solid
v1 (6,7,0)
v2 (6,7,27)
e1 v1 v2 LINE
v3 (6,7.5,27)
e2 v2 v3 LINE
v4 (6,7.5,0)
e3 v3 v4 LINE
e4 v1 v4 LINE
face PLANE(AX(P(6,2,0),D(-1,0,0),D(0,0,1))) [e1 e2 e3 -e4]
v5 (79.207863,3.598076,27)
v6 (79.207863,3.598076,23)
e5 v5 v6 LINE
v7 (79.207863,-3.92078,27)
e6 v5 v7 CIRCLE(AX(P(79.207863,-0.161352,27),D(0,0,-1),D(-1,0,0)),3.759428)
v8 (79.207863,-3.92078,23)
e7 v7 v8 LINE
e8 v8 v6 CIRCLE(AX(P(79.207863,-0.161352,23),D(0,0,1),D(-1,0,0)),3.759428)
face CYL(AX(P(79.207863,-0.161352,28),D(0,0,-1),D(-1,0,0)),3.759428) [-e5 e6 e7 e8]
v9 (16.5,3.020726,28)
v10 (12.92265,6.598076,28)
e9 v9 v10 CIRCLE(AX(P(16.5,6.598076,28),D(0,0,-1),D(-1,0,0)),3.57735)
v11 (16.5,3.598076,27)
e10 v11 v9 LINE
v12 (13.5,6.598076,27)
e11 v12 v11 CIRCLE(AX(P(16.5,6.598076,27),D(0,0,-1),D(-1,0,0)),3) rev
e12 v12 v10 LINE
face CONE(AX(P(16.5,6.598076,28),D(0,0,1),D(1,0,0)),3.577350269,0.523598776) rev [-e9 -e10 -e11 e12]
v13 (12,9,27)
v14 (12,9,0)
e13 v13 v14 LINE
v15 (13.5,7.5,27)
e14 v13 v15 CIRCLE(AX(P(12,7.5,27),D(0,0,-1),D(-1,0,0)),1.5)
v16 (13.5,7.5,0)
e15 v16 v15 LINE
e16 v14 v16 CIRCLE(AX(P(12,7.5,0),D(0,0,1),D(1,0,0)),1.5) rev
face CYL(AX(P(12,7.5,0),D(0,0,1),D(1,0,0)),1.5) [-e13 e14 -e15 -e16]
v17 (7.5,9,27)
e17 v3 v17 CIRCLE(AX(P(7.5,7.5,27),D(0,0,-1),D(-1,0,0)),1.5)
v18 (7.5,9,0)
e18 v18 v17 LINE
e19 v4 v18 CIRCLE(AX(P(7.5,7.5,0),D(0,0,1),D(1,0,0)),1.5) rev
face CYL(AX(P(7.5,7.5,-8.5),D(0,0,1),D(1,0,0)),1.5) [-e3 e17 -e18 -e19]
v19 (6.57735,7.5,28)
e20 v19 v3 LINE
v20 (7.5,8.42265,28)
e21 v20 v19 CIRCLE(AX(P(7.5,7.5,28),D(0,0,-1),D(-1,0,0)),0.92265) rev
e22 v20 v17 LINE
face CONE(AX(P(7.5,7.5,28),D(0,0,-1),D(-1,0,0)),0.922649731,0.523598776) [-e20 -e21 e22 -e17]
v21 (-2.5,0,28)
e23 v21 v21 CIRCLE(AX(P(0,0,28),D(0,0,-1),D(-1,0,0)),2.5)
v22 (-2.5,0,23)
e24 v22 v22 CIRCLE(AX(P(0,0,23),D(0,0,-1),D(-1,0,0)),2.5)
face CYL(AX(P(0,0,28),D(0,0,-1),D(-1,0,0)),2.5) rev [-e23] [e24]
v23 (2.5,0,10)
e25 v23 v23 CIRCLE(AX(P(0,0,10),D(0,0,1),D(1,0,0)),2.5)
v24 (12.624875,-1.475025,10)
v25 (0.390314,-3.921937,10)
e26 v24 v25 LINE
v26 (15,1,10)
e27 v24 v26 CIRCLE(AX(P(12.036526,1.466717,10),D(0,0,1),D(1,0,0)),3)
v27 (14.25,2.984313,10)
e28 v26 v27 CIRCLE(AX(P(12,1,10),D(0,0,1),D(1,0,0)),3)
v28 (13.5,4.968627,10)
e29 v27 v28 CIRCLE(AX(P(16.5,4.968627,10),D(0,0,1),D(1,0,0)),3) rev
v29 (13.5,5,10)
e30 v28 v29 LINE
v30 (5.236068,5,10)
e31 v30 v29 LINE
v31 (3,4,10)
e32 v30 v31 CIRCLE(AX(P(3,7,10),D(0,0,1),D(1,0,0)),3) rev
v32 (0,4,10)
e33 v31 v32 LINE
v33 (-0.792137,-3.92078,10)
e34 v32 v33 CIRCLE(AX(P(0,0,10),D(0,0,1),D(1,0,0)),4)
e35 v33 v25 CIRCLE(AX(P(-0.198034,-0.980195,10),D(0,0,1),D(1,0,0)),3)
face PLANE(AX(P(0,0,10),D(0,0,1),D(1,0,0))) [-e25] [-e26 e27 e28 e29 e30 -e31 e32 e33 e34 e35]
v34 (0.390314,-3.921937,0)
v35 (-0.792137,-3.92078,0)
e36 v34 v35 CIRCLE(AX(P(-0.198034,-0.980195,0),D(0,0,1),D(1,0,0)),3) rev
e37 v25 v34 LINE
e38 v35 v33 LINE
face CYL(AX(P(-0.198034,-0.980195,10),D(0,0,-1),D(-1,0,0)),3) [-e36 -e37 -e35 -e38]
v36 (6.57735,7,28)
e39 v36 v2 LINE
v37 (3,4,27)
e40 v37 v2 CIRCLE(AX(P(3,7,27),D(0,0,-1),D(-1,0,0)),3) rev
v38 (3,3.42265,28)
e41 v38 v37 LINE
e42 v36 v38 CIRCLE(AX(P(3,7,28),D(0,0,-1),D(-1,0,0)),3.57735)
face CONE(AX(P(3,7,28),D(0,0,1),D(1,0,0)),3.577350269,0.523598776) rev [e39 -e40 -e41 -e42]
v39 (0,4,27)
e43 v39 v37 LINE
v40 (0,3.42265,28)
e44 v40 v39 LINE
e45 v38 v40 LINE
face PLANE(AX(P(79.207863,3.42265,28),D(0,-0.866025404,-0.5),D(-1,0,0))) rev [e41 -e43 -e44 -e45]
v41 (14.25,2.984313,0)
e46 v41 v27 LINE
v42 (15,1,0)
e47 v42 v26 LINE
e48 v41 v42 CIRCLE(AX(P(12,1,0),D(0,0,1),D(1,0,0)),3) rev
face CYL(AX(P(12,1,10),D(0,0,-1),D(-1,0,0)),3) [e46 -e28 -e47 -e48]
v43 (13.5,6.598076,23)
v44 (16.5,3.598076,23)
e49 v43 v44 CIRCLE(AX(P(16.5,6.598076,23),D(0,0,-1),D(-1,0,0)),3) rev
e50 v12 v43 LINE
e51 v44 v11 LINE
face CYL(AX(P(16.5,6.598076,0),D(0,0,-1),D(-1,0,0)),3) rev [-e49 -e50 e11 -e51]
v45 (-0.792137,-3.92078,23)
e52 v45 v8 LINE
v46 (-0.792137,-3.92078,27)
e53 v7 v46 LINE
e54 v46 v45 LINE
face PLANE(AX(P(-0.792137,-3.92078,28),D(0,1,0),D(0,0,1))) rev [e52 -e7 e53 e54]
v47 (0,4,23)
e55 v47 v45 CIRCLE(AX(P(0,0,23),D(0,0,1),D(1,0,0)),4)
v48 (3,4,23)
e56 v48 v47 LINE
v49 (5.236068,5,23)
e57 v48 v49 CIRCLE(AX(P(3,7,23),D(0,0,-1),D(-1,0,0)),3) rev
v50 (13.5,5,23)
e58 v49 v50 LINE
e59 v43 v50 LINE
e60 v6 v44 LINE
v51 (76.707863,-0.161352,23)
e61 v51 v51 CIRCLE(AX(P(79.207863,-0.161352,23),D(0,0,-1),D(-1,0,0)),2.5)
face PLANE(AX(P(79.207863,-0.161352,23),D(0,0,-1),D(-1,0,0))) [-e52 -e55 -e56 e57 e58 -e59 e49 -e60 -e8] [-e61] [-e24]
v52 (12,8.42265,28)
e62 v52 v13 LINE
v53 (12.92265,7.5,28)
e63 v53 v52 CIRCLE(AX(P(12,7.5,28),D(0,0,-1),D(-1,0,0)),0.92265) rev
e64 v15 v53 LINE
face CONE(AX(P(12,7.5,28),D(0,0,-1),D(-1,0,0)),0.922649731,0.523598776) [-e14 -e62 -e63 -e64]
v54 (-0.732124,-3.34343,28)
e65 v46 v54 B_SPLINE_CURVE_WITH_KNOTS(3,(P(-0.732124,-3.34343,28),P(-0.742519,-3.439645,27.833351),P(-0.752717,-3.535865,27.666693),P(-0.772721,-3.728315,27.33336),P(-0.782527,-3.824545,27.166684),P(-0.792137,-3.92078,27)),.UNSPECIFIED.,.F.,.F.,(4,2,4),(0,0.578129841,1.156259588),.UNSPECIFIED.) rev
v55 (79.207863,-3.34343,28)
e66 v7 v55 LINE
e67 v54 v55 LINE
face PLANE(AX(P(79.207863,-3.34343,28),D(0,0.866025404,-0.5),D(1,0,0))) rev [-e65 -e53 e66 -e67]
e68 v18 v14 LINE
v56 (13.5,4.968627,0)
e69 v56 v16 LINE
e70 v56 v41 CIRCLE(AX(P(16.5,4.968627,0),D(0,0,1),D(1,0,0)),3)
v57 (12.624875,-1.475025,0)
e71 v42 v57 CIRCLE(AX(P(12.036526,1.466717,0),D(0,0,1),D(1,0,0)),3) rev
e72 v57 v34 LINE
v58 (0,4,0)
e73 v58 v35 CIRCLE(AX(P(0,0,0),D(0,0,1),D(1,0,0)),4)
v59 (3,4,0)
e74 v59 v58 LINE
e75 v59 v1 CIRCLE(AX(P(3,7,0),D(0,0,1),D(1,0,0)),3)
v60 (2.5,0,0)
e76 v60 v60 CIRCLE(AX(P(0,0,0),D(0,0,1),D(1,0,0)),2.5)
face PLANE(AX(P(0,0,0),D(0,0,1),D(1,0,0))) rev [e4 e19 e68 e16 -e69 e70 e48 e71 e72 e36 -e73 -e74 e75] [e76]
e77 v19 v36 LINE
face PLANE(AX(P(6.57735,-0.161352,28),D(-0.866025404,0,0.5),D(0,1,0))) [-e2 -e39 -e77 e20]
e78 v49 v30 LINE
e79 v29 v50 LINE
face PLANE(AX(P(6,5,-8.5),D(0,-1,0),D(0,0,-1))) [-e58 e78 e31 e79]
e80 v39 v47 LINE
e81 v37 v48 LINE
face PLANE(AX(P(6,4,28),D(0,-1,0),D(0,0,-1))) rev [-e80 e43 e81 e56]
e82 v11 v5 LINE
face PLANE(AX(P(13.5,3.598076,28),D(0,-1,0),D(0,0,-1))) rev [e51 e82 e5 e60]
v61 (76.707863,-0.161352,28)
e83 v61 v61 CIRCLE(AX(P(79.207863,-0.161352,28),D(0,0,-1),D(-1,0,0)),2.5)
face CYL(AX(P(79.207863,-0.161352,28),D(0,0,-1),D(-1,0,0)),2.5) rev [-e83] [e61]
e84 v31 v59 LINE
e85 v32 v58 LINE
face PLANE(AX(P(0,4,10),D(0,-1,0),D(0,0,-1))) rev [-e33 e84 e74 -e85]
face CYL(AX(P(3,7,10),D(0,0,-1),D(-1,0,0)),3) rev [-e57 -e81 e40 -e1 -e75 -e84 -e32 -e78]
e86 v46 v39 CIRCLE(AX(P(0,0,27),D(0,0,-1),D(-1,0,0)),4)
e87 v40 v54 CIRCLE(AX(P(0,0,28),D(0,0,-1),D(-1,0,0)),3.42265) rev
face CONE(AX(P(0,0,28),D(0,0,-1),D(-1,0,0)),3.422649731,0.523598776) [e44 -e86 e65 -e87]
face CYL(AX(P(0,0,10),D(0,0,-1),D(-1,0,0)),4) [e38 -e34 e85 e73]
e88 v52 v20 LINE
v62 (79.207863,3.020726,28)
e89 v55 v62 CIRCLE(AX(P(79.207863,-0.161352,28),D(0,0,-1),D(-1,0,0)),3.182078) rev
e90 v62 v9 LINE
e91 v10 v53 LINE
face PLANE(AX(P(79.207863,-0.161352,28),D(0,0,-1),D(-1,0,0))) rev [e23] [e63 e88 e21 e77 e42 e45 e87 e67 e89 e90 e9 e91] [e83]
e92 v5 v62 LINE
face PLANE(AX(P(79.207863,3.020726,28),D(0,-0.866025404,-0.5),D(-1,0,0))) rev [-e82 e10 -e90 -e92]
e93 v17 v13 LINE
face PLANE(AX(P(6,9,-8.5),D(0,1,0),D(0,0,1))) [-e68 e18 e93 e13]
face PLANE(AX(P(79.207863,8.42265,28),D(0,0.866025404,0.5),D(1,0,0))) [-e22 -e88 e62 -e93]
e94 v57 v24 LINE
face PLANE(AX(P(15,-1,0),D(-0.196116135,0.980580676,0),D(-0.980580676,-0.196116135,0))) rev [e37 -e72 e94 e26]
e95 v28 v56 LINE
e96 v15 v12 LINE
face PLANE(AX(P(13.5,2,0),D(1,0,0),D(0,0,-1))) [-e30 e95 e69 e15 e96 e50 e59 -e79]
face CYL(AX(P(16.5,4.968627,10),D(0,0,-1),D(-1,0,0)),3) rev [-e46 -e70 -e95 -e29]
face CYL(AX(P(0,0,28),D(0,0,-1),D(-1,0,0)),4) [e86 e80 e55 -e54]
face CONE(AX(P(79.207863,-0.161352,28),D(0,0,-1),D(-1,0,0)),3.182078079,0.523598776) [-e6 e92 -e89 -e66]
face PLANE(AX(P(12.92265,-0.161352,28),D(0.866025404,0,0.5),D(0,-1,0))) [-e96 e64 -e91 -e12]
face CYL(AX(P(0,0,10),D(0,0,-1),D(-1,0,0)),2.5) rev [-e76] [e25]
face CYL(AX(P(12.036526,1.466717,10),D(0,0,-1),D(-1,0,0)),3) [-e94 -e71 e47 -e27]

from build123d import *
from OCP.BRepFilletAPI import BRepFilletAPI_MakeChamfer

# Parameters (mm, degrees)
SKETCH1_R                       = 2.5
BOSS_EXTRUDE1_DEPTH             = 10
FILLET1_R                       = 3
CUT_EXTRUDE1_DEPTH              = 19.466185313
FILLET2_R                       = 3
FILLET3_R                       = 3
BOSS_EXTRUDE2_DEPTH             = 3
BOSS_EXTRUDE2_DEPTH_BACK        = 2
SKETCH3_W                       = 7.5
SKETCH3_H                       = 10
BOSS_EXTRUDE3_DEPTH             = 13
BOSS_EXTRUDE3_DIRECTION_2_REACH = 21.339
BOSS_EXTRUDE4_DEPTH             = 5
SKETCH6_R                       = 2.5
CUT_EXTRUDE2_DEPTH              = 87.565417468
FILLET5_R                       = 3
FILLET6_R                       = 1.5
CHAMFER1_SIZE                   = 1
CHAMFER1_SIZE2                  = 0.577350269


with BuildPart() as part:
    # Sketch1 → Boss-Extrude1 (new body)
    with BuildSketch(Plane.XY):
        with BuildLine():
            Line((0, 4), (15, 4))
            Line((15, 4), (15, -4))
            Line((15, -4), (0, -4))
            ThreePointArc((0, -4), (-4, 0), (0, 4))
        make_face()
        Circle(SKETCH1_R, mode=Mode.SUBTRACT)
    extrude(amount=BOSS_EXTRUDE1_DEPTH)

    # Fillet1
    fillet1_edges = [part.edges().sort_by_distance(p)[0] for p in [
        (15, 4, 5),
        (15, -4, 5),
    ]]
    fillet(fillet1_edges, radius=FILLET1_R)

    # Sketch2 → Cut-Extrude1 (cut, through all)
    with BuildSketch(Plane.XY.offset(10)):
        Polygon((15, -1), (0, -4), (15, -4), align=None)
    extrude(amount=-CUT_EXTRUDE1_DEPTH, mode=Mode.SUBTRACT)

    # Fillet2
    # the kernel refuses this fillet: 3 mm, written as the material it takes off along each edge
    with BuildSketch(Plane(origin=(15, -1, -6.055404624), x_dir=(-0.9805806756909201, -0.19611613513818393, 0), z_dir=(0, 0, 1))) as fillet2_piece_1:
        with BuildLine():
            CenterArc((2.42216185, -3), FILLET2_R, 90, 69.740076193)
            Line((-0.39223227, -1.961161351), (-0.448520153, -1.940384578))
            ThreePointArc((-0.448520153, -1.940384578), (-0.254950976, -0.968813708), (-0.058834841, 0.011766968))
            Line((-0.058834841, 0.011766968), (0, 0.06))
            Line((0, 0.06), (2.42216185, 0.06))
            Line((2.42216185, 0.06), (2.42216185, 0))
        make_face()
    extrude(amount=22.110809248, mode=Mode.SUBTRACT)

    # Fillet3
    fillet3_edges = [part.edges().sort_by_distance(p)[0] for p in [
        (0, -4, 5),
    ]]
    fillet(fillet3_edges, radius=FILLET3_R)

    # Sketch3 → Boss-Extrude2 (add, two sides: drawn at the far end of the back side and taken through both)
    with BuildSketch(Plane(origin=(0, 4, 0), x_dir=(1, 0, 0), z_dir=(0, 1, 0)).offset(-BOSS_EXTRUDE2_DEPTH_BACK)):
        with Locations((9.75, -5)):
            Rectangle(SKETCH3_W, SKETCH3_H)
    extrude(amount=BOSS_EXTRUDE2_DEPTH + BOSS_EXTRUDE2_DEPTH_BACK)

    # Sketch4 → Boss-Extrude3 (add)
    with BuildSketch(Plane.XY.offset(10)):
        Polygon((6, 7), (6, 9), (13.5, 9), (13.5, 7), (13.5, 5), (6, 5), align=None)
    extrude(amount=BOSS_EXTRUDE3_DEPTH)

    # Boss-Extrude3 direction 2: up to this face of the body (flat: up to its plane)
    boss_extrude3_direction_2_end = Plane(part.part.faces().sort_by_distance((6.608331714, 1.519169976, 0))[0])
    # Sketch4 → Boss-Extrude3 direction 2 (add, up to the picked face)
    with BuildSketch(Plane.XY.offset(10), mode=Mode.PRIVATE) as boss_extrude3_direction_2_sk1:
        Polygon((6, 7), (6, 9), (13.5, 9), (13.5, 7), (13.5, 5), (6, 5), align=None)
    boss_extrude3_direction_2_tool1 = split(extrude(boss_extrude3_direction_2_sk1.sketch, amount=-BOSS_EXTRUDE3_DIRECTION_2_REACH, mode=Mode.PRIVATE), bisect_by=boss_extrude3_direction_2_end, keep=Keep.BOTH, mode=Mode.PRIVATE)
    add(boss_extrude3_direction_2_tool1.solids().sort_by(Axis((9.75, 7, 10), (0, 0, -1)))[0])

    # Sketch5 → Boss-Extrude4 (add)
    with BuildSketch(Plane.XY.offset(23)):
        with BuildLine():
            Line((13.5, 3.598076211), (13.5, 5))
            Line((13.5, 5), (13.5, 9))
            Line((13.5, 9), (6, 9))
            Line((6, 9), (6, 5))
            Line((6, 5), (6, 4))
            Line((6, 4), (0, 4))
            ThreePointArc((0, 4), (-3.980145848, 0.398044003), (-0.792136593, -3.920780486))
            Line((-0.792136593, -3.920780486), (79.207863407, -3.920780486))
            ThreePointArc((79.207863407, -3.920780486), (82.967291756, -0.161352137), (79.207863407, 3.598076211))
            Line((79.207863407, 3.598076211), (13.5, 3.598076211))
        make_face()
    extrude(amount=BOSS_EXTRUDE4_DEPTH)

    # Sketch6 → Cut-Extrude2 (cut, through all)
    with BuildSketch(Plane(origin=(0, 0, 23), x_dir=(-1, 0, 0), z_dir=(0, 0, -1))):
        with Locations(Location((0, 0, 0), (0, 0, 180))):
            Circle(SKETCH6_R)
        with Locations((-79.207863407, -0.161352137)):
            Circle(SKETCH6_R)
    extrude(amount=-CUT_EXTRUDE2_DEPTH, mode=Mode.SUBTRACT)

    # Fillet5
    # the kernel refuses this fillet: 3 mm, written as the material it adds along each edge
    with BuildSketch(Plane(origin=(13.5, 3.598076211, 23), x_dir=(0, 1, 0), z_dir=(0, 0, 1))) as fillet5_piece_1:
        with BuildLine():
            CenterArc((FILLET5_R, -FILLET5_R), FILLET5_R, 90, 90)
            Line((0, -FILLET5_R), (0, 0))
            Line((0, 0), (FILLET5_R, 0))
        make_face()
    extrude(amount=5)
    with BuildSketch(Plane(origin=(6, 4, 15.5), x_dir=(0, 1, 0), z_dir=(0, 0, 1))) as fillet5_piece_2_section:
        with BuildLine():
            CenterArc((FILLET5_R, FILLET5_R), FILLET5_R, 180, 90)
            Line((0, FILLET5_R), (0, 0))
            Line((0, 0), (FILLET5_R, 0))
        make_face()
    fillet5_piece_2 = extrude(amount=12.5, mode=Mode.PRIVATE)
    fillet5_piece_2 = split(fillet5_piece_2, bisect_by=Plane(origin=(6, 5, 15.5), z_dir=(0, 1, 0)), keep=Keep.TOP, mode=Mode.PRIVATE)
    add(fillet5_piece_2)
    with BuildSketch(Plane(origin=(6, 4, 23), x_dir=(0, 1, 0), z_dir=(0, 0, 1))) as fillet5_piece_3:
        with BuildLine():
            CenterArc((FILLET5_R, FILLET5_R), FILLET5_R, 180, 90)
            Line((0, FILLET5_R), (0, 0))
            Line((0, 0), (FILLET5_R, 0))
        make_face()
    extrude(amount=5)
    with BuildSketch(Plane(origin=(13.5, 3.598076211, 0), x_dir=(0, 1, 0), z_dir=(0, 0, 1))) as fillet5_piece_4:
        with BuildLine():
            CenterArc((1.370550755, -3), FILLET5_R, 90, 41.409622109)
            ThreePointArc((-0.613762728, -0.75), (-0.276396038, -0.399947676), (0, 0))
            Line((0, 0), (1.370550755, 0))
        make_face()
    extrude(amount=10)
    with BuildSketch(Plane(origin=(6, 4, 0), x_dir=(-1, 0, 0), z_dir=(0, 0, 1))) as fillet5_piece_5:
        with BuildLine():
            CenterArc((FILLET5_R, -FILLET5_R), FILLET5_R, 90, 90)
            Line((0, -FILLET5_R), (0, 0))
            Line((0, 0), (FILLET5_R, 0))
        make_face()
    extrude(amount=10)
    with BuildSketch(Plane(origin=(6, 4, -7.5), x_dir=(-1, 0, 0), z_dir=(0, 0, 1))) as fillet5_piece_6_section:
        with BuildLine():
            CenterArc((FILLET5_R, -FILLET5_R), FILLET5_R, 90, 90)
            Line((0, -FILLET5_R), (0, 0))
            Line((0, 0), (FILLET5_R, 0))
        make_face()
    fillet5_piece_6 = extrude(amount=25, mode=Mode.PRIVATE)
    fillet5_piece_6 = split(fillet5_piece_6, bisect_by=Plane(origin=(6, 4, 10), z_dir=(0, 0, 1)), keep=Keep.TOP, mode=Mode.PRIVATE)
    fillet5_piece_6 = split(fillet5_piece_6, bisect_by=Plane(origin=(6, 5, -7.5), z_dir=(0, 1, 0)), keep=Keep.TOP, mode=Mode.PRIVATE)
    add(fillet5_piece_6)

    # Fillet6
    fillet6_edges = [part.edges().sort_by_distance(p)[0] for p in [
        (6, 9, 14),
        (13.5, 9, 14),
    ]]
    fillet(fillet6_edges, radius=FILLET6_R)

    # Chamfer1: one chamfer whose edges measure the first distance from different faces: ONE call of the kernel's chamfer builder (chamfer() names one face for all edges)
    chamfer1_edges_1 = [part.edges().sort_by_distance(p)[0] for p in [
        (47.853931704, 3.598076211, 28),
    ]]
    chamfer1_side_1 = [part.faces().sort_by_distance(p)[0] for p in [
        (47.853931704, 3.598076211, 25.5),
    ]]
    chamfer1_edges_2 = [part.edges().sort_by_distance(p)[0] for p in [
        (-3.980145848, 0.398044003, 28),
    ]]
    chamfer1_side_2 = [part.faces().sort_by_distance(p)[0] for p in [
        (-3.980145848, 0.398044003, 25.5),
    ]]
    chamfer1_edges_3 = [part.edges().sort_by_distance(p)[0] for p in [
        (39.207863407, -3.920780486, 28),
    ]]
    chamfer1_side_3 = [part.faces().sort_by_distance(p)[0] for p in [
        (39.207863407, -3.920780486, 25.5),
    ]]
    chamfer1_edges_4 = [part.edges().sort_by_distance(p)[0] for p in [
        (82.967291756, -0.161352137, 28),
    ]]
    chamfer1_side_4 = [part.faces().sort_by_distance(p)[0] for p in [
        (82.967291756, -0.161352137, 25.5),
    ]]
    chamfer1_edges_5 = [part.edges().sort_by_distance(p)[0] for p in [
        (13.5, 7.049038106, 28),
    ]]
    chamfer1_side_5 = [part.faces().sort_by_distance(p)[0] for p in [
        (13.5, 6.301445777, 12.480297412),
    ]]
    chamfer1_edges_6 = [part.edges().sort_by_distance(p)[0] for p in [
        (1.5, 4, 28),
    ]]
    chamfer1_side_6 = [part.faces().sort_by_distance(p)[0] for p in [
        (1.5, 4, 25.5),
    ]]
    chamfer1_edges_7 = [part.edges().sort_by_distance(p)[0] for p in [
        (14.378679656, 4.476755868, 28),
    ]]
    chamfer1_side_7 = [part.faces().sort_by_distance(p)[0] for p in [
        (14.378679656, 4.476755868, 25.5),
    ]]
    chamfer1_edges_8 = [part.edges().sort_by_distance(p)[0] for p in [
        (5.121320344, 4.878679656, 28),
    ]]
    chamfer1_side_8 = [part.faces().sort_by_distance(p)[0] for p in [
        (5.121320344, 4.878679656, 14),
    ]]
    chamfer1_edges_9 = [part.edges().sort_by_distance(p)[0] for p in [
        (9.75, 9, 28),
    ]]
    chamfer1_side_9 = [part.faces().sort_by_distance(p)[0] for p in [
        (9.75, 9, 14),
    ]]
    chamfer1_edges_10 = [part.edges().sort_by_distance(p)[0] for p in [
        (6, 7.25, 28),
    ]]
    chamfer1_side_10 = [part.faces().sort_by_distance(p)[0] for p in [
        (6, 7.25, 14),
    ]]
    chamfer1_edges_11 = [part.edges().sort_by_distance(p)[0] for p in [
        (13.060660172, 8.560660172, 28),
    ]]
    chamfer1_side_11 = [part.faces().sort_by_distance(p)[0] for p in [
        (13.060660172, 8.560660172, 14),
    ]]
    chamfer1_edges_12 = [part.edges().sort_by_distance(p)[0] for p in [
        (6.439339828, 8.560660172, 28),
    ]]
    chamfer1_side_12 = [part.faces().sort_by_distance(p)[0] for p in [
        (6.439339828, 8.560660172, 14),
    ]]
    chamfer1 = BRepFilletAPI_MakeChamfer(part.part.solid().wrapped)
    for e in chamfer1_edges_1:
        chamfer1.Add(CHAMFER1_SIZE, CHAMFER1_SIZE2, e.wrapped, chamfer1_side_1[0].wrapped)  # the first distance lies on this face
    for e in chamfer1_edges_2:
        chamfer1.Add(CHAMFER1_SIZE, CHAMFER1_SIZE2, e.wrapped, chamfer1_side_2[0].wrapped)  # the first distance lies on this face
    for e in chamfer1_edges_3:
        chamfer1.Add(CHAMFER1_SIZE, CHAMFER1_SIZE2, e.wrapped, chamfer1_side_3[0].wrapped)  # the first distance lies on this face
    for e in chamfer1_edges_4:
        chamfer1.Add(CHAMFER1_SIZE, CHAMFER1_SIZE2, e.wrapped, chamfer1_side_4[0].wrapped)  # the first distance lies on this face
    for e in chamfer1_edges_5:
        chamfer1.Add(CHAMFER1_SIZE, CHAMFER1_SIZE2, e.wrapped, chamfer1_side_5[0].wrapped)  # the first distance lies on this face
    for e in chamfer1_edges_6:
        chamfer1.Add(CHAMFER1_SIZE, CHAMFER1_SIZE2, e.wrapped, chamfer1_side_6[0].wrapped)  # the first distance lies on this face
    for e in chamfer1_edges_7:
        chamfer1.Add(CHAMFER1_SIZE, CHAMFER1_SIZE2, e.wrapped, chamfer1_side_7[0].wrapped)  # the first distance lies on this face
    for e in chamfer1_edges_8:
        chamfer1.Add(CHAMFER1_SIZE, CHAMFER1_SIZE2, e.wrapped, chamfer1_side_8[0].wrapped)  # the first distance lies on this face
    for e in chamfer1_edges_9:
        chamfer1.Add(CHAMFER1_SIZE, CHAMFER1_SIZE2, e.wrapped, chamfer1_side_9[0].wrapped)  # the first distance lies on this face
    for e in chamfer1_edges_10:
        chamfer1.Add(CHAMFER1_SIZE, CHAMFER1_SIZE2, e.wrapped, chamfer1_side_10[0].wrapped)  # the first distance lies on this face
    for e in chamfer1_edges_11:
        chamfer1.Add(CHAMFER1_SIZE, CHAMFER1_SIZE2, e.wrapped, chamfer1_side_11[0].wrapped)  # the first distance lies on this face
    for e in chamfer1_edges_12:
        chamfer1.Add(CHAMFER1_SIZE, CHAMFER1_SIZE2, e.wrapped, chamfer1_side_12[0].wrapped)  # the first distance lies on this face
    add(Compound.cast(chamfer1.Shape()), mode=Mode.REPLACE)


solid = part.part
